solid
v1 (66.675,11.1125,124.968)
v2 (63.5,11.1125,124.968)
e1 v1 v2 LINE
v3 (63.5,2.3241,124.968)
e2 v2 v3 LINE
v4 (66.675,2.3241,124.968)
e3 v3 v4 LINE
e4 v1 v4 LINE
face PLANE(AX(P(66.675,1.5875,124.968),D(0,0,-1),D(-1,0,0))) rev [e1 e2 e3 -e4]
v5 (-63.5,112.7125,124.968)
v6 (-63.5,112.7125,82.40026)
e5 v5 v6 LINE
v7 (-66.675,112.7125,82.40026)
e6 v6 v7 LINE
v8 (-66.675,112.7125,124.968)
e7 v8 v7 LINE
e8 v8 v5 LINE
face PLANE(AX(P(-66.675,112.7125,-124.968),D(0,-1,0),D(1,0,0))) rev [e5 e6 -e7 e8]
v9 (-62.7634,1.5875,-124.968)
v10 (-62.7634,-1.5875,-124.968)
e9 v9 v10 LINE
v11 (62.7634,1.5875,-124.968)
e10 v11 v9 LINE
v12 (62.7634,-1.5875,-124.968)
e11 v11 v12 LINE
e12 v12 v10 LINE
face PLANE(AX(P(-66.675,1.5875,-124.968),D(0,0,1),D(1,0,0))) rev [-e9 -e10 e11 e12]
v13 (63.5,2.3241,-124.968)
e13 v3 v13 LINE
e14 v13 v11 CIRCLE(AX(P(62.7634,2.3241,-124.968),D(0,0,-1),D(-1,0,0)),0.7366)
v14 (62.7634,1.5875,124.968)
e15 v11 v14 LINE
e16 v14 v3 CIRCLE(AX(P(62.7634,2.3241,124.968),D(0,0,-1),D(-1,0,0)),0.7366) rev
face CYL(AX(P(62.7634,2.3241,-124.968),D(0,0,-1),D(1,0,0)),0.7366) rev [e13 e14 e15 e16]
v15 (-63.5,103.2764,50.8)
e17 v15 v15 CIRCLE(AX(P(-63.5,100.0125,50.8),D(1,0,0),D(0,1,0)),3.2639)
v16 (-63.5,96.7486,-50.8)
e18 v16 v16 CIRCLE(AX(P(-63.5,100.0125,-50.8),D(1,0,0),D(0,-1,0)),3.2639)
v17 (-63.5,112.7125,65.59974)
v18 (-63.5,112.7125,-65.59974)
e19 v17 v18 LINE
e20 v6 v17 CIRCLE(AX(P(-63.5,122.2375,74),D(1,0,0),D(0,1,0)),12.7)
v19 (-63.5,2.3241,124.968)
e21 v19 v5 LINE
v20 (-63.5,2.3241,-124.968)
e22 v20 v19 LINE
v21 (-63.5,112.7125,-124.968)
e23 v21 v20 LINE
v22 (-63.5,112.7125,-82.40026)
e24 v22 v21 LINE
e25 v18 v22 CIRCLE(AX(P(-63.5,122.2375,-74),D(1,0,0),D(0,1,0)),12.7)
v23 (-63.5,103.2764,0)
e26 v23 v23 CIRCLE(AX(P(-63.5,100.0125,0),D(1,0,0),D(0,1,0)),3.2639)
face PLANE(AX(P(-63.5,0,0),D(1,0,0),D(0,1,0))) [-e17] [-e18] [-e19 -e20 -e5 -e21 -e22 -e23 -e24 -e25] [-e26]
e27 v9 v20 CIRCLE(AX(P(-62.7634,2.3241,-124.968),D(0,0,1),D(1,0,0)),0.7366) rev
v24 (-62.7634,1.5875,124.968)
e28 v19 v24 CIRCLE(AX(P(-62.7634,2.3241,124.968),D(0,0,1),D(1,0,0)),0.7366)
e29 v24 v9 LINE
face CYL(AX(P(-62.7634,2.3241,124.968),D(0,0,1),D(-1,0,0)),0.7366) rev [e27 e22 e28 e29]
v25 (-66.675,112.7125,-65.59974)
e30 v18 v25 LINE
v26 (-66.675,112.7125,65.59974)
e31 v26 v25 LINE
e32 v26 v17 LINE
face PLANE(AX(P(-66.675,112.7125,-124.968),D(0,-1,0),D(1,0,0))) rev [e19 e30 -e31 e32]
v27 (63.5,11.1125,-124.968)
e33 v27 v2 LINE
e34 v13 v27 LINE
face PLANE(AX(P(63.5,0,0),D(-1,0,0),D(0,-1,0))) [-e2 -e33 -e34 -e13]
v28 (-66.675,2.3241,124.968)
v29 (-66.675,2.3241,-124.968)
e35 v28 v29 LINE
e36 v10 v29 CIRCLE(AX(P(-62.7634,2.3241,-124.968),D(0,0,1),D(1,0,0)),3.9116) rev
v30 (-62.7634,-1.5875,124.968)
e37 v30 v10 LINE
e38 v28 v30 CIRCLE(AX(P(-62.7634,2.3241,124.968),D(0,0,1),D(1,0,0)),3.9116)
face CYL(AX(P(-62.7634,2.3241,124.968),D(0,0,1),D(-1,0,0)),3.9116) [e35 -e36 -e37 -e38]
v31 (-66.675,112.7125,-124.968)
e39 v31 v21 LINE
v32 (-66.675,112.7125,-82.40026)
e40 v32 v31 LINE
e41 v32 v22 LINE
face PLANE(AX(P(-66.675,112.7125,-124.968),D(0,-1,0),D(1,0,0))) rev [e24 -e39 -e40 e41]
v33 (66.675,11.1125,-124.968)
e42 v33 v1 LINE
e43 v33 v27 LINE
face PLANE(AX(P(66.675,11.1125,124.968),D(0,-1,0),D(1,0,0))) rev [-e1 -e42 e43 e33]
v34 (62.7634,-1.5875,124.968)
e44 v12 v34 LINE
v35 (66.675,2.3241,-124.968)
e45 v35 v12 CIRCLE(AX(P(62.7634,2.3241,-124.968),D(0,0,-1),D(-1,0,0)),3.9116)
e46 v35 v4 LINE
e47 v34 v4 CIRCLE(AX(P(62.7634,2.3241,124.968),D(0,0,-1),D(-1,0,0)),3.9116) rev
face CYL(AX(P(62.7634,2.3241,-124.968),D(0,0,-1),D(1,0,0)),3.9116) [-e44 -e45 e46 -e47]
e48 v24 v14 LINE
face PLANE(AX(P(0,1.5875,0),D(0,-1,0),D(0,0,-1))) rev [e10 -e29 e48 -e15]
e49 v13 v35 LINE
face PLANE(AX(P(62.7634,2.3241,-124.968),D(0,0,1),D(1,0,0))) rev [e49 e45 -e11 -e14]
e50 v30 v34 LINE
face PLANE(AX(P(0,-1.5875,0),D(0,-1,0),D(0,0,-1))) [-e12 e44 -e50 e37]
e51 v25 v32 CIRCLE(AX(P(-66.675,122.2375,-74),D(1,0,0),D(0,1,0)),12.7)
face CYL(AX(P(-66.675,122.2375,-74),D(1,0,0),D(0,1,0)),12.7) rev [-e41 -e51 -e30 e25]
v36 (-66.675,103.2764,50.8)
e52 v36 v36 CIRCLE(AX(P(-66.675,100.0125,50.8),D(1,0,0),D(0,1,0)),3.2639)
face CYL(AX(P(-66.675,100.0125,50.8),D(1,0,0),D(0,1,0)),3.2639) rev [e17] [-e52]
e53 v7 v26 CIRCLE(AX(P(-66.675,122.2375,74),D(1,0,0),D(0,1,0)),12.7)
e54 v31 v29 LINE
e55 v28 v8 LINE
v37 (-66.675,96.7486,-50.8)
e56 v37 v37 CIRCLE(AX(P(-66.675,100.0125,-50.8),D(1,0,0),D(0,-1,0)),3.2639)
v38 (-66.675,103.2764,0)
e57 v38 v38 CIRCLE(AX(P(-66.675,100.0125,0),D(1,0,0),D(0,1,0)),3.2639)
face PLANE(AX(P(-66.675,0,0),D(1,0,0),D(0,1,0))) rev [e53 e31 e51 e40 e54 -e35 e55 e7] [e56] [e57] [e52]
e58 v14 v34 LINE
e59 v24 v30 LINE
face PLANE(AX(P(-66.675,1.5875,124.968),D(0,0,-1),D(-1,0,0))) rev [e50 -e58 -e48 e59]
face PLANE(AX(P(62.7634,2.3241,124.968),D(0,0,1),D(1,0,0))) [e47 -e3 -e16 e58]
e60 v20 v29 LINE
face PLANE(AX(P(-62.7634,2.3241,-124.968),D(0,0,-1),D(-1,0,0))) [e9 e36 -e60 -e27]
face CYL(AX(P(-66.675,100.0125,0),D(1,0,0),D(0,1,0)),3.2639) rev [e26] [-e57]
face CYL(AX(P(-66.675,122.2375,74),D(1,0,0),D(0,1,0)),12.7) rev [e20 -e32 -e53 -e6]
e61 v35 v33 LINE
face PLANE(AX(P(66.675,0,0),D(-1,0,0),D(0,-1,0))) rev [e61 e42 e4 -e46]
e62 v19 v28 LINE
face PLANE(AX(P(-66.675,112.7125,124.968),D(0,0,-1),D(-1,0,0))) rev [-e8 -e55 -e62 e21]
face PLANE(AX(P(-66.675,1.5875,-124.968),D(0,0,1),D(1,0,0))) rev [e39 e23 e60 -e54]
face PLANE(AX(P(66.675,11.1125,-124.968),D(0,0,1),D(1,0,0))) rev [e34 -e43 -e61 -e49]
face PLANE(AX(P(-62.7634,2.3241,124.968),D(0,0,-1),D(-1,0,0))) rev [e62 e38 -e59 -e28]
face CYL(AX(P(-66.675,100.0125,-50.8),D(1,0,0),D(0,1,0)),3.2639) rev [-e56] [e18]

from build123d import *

# Parameters (mm, degrees)
SKETCH4_W                    = 133.35
SKETCH4_H                    = 249.936
BOSS_EXTRUDE2_DEPTH          = 1.5875
EDGE_FLANGE1_STRIP_W         = 14.1732
EDGE_FLANGE1_STRIP_H         = 3.175
EDGE_FLANGE1_STRIP_CUT_DEPTH = 249.936
EDGE_FLANGE1_DEPTH           = 249.936
EDGE_FLANGE2_STRIP_W         = 14.1732
EDGE_FLANGE2_STRIP_H         = 3.175
EDGE_FLANGE2_STRIP_CUT_DEPTH = 249.936
EDGE_FLANGE2_DEPTH           = 249.936
SKETCH18_R                   = 3.2639
CUT_EXTRUDE1_DEPTH           = 213.759580995
SKETCH20_R                   = 12.7
CUT_EXTRUDE2_DEPTH           = 213.759580995


# Sheet-metal steps are written as plain solids
with BuildPart() as part:
    # Sketch4 → Boss-Extrude2 (new, symmetric)
    with BuildSketch(Plane(origin=(0, 0, 0), x_dir=(1, 0, 0), z_dir=(0, 1, 0))):
        Rectangle(SKETCH4_W, SKETCH4_H)
    extrude(amount=BOSS_EXTRUDE2_DEPTH, both=True)

    # Edge-Flange1 strip (across the edge) → Edge-Flange1 strip cut (cut)
    with BuildSketch(Plane(origin=(-66.675, 1.5875, -124.968), x_dir=(1, 0, 0), z_dir=(0, 0, 1))):
        with Locations((-3.175, -1.5875)):
            Rectangle(EDGE_FLANGE1_STRIP_W, EDGE_FLANGE1_STRIP_H)
    extrude(amount=EDGE_FLANGE1_STRIP_CUT_DEPTH, mode=Mode.SUBTRACT)

    # Edge-Flange1 section (across the edge) → Edge-Flange1 (add)
    with BuildSketch(Plane(origin=(-66.675, 1.5875, -124.968), x_dir=(1, 0, 0), z_dir=(0, 0, 1))):
        with BuildLine():
            Line((0, 0.7366), (0, 111.125))
            Line((0, 111.125), (3.175, 111.125))
            Line((3.175, 111.125), (3.175, 0.7366))
            ThreePointArc((3.175, 0.7366), (3.390745145, 0.215745145), (3.9116, 0))
            Line((3.9116, 0), (3.9116, -3.175))
            ThreePointArc((3.9116, -3.175), (1.145681115, -2.029318885), (0, 0.7366))
        make_face()
    extrude(amount=EDGE_FLANGE1_DEPTH)

    # Edge-Flange2 strip (across the edge) → Edge-Flange2 strip cut (cut)
    with BuildSketch(Plane(origin=(66.675, 1.5875, 124.968), x_dir=(-1, 0, 0), z_dir=(0, 0, -1))):
        with Locations((-3.175, -1.5875)):
            Rectangle(EDGE_FLANGE2_STRIP_W, EDGE_FLANGE2_STRIP_H)
    extrude(amount=EDGE_FLANGE2_STRIP_CUT_DEPTH, mode=Mode.SUBTRACT)

    # Edge-Flange2 section (across the edge) → Edge-Flange2 (add)
    with BuildSketch(Plane(origin=(66.675, 1.5875, 124.968), x_dir=(-1, 0, 0), z_dir=(0, 0, -1))):
        with BuildLine():
            Line((0, 0.7366), (0, 9.525))
            Line((0, 9.525), (3.175, 9.525))
            Line((3.175, 9.525), (3.175, 0.7366))
            ThreePointArc((3.175, 0.7366), (3.390745145, 0.215745145), (3.9116, 0))
            Line((3.9116, 0), (3.9116, -3.175))
            ThreePointArc((3.9116, -3.175), (1.145681115, -2.029318885), (0, 0.7366))
        make_face()
    extrude(amount=EDGE_FLANGE2_DEPTH)

    # Sketch18 → Cut-Extrude1 (cut, through all)
    with BuildSketch(Plane(origin=(-63.5, 0, 0), x_dir=(0, 0, -1), z_dir=(1, 0, 0))):
        with Locations(Location((-50.8, 100.0125, 0), (0, 0, 90))):
            Circle(SKETCH18_R)
        with Locations(Location((50.8, 100.0125, 0), (0, 0, 270))):
            Circle(SKETCH18_R)
        with Locations(Location((0, 100.0125, 0), (0, 0, 90))):
            Circle(SKETCH18_R)
    extrude(amount=-CUT_EXTRUDE1_DEPTH, mode=Mode.SUBTRACT)

    # Sketch20 → Cut-Extrude2 (cut, through all)
    with BuildSketch(Plane(origin=(-63.5, 0, 0), x_dir=(0, 0, -1), z_dir=(1, 0, 0))):
        with Locations((-74, 122.2375)):
            Circle(SKETCH20_R)
        with Locations((74, 122.2375)):
            Circle(SKETCH20_R)
    extrude(amount=-CUT_EXTRUDE2_DEPTH, mode=Mode.SUBTRACT)


solid = part.part
